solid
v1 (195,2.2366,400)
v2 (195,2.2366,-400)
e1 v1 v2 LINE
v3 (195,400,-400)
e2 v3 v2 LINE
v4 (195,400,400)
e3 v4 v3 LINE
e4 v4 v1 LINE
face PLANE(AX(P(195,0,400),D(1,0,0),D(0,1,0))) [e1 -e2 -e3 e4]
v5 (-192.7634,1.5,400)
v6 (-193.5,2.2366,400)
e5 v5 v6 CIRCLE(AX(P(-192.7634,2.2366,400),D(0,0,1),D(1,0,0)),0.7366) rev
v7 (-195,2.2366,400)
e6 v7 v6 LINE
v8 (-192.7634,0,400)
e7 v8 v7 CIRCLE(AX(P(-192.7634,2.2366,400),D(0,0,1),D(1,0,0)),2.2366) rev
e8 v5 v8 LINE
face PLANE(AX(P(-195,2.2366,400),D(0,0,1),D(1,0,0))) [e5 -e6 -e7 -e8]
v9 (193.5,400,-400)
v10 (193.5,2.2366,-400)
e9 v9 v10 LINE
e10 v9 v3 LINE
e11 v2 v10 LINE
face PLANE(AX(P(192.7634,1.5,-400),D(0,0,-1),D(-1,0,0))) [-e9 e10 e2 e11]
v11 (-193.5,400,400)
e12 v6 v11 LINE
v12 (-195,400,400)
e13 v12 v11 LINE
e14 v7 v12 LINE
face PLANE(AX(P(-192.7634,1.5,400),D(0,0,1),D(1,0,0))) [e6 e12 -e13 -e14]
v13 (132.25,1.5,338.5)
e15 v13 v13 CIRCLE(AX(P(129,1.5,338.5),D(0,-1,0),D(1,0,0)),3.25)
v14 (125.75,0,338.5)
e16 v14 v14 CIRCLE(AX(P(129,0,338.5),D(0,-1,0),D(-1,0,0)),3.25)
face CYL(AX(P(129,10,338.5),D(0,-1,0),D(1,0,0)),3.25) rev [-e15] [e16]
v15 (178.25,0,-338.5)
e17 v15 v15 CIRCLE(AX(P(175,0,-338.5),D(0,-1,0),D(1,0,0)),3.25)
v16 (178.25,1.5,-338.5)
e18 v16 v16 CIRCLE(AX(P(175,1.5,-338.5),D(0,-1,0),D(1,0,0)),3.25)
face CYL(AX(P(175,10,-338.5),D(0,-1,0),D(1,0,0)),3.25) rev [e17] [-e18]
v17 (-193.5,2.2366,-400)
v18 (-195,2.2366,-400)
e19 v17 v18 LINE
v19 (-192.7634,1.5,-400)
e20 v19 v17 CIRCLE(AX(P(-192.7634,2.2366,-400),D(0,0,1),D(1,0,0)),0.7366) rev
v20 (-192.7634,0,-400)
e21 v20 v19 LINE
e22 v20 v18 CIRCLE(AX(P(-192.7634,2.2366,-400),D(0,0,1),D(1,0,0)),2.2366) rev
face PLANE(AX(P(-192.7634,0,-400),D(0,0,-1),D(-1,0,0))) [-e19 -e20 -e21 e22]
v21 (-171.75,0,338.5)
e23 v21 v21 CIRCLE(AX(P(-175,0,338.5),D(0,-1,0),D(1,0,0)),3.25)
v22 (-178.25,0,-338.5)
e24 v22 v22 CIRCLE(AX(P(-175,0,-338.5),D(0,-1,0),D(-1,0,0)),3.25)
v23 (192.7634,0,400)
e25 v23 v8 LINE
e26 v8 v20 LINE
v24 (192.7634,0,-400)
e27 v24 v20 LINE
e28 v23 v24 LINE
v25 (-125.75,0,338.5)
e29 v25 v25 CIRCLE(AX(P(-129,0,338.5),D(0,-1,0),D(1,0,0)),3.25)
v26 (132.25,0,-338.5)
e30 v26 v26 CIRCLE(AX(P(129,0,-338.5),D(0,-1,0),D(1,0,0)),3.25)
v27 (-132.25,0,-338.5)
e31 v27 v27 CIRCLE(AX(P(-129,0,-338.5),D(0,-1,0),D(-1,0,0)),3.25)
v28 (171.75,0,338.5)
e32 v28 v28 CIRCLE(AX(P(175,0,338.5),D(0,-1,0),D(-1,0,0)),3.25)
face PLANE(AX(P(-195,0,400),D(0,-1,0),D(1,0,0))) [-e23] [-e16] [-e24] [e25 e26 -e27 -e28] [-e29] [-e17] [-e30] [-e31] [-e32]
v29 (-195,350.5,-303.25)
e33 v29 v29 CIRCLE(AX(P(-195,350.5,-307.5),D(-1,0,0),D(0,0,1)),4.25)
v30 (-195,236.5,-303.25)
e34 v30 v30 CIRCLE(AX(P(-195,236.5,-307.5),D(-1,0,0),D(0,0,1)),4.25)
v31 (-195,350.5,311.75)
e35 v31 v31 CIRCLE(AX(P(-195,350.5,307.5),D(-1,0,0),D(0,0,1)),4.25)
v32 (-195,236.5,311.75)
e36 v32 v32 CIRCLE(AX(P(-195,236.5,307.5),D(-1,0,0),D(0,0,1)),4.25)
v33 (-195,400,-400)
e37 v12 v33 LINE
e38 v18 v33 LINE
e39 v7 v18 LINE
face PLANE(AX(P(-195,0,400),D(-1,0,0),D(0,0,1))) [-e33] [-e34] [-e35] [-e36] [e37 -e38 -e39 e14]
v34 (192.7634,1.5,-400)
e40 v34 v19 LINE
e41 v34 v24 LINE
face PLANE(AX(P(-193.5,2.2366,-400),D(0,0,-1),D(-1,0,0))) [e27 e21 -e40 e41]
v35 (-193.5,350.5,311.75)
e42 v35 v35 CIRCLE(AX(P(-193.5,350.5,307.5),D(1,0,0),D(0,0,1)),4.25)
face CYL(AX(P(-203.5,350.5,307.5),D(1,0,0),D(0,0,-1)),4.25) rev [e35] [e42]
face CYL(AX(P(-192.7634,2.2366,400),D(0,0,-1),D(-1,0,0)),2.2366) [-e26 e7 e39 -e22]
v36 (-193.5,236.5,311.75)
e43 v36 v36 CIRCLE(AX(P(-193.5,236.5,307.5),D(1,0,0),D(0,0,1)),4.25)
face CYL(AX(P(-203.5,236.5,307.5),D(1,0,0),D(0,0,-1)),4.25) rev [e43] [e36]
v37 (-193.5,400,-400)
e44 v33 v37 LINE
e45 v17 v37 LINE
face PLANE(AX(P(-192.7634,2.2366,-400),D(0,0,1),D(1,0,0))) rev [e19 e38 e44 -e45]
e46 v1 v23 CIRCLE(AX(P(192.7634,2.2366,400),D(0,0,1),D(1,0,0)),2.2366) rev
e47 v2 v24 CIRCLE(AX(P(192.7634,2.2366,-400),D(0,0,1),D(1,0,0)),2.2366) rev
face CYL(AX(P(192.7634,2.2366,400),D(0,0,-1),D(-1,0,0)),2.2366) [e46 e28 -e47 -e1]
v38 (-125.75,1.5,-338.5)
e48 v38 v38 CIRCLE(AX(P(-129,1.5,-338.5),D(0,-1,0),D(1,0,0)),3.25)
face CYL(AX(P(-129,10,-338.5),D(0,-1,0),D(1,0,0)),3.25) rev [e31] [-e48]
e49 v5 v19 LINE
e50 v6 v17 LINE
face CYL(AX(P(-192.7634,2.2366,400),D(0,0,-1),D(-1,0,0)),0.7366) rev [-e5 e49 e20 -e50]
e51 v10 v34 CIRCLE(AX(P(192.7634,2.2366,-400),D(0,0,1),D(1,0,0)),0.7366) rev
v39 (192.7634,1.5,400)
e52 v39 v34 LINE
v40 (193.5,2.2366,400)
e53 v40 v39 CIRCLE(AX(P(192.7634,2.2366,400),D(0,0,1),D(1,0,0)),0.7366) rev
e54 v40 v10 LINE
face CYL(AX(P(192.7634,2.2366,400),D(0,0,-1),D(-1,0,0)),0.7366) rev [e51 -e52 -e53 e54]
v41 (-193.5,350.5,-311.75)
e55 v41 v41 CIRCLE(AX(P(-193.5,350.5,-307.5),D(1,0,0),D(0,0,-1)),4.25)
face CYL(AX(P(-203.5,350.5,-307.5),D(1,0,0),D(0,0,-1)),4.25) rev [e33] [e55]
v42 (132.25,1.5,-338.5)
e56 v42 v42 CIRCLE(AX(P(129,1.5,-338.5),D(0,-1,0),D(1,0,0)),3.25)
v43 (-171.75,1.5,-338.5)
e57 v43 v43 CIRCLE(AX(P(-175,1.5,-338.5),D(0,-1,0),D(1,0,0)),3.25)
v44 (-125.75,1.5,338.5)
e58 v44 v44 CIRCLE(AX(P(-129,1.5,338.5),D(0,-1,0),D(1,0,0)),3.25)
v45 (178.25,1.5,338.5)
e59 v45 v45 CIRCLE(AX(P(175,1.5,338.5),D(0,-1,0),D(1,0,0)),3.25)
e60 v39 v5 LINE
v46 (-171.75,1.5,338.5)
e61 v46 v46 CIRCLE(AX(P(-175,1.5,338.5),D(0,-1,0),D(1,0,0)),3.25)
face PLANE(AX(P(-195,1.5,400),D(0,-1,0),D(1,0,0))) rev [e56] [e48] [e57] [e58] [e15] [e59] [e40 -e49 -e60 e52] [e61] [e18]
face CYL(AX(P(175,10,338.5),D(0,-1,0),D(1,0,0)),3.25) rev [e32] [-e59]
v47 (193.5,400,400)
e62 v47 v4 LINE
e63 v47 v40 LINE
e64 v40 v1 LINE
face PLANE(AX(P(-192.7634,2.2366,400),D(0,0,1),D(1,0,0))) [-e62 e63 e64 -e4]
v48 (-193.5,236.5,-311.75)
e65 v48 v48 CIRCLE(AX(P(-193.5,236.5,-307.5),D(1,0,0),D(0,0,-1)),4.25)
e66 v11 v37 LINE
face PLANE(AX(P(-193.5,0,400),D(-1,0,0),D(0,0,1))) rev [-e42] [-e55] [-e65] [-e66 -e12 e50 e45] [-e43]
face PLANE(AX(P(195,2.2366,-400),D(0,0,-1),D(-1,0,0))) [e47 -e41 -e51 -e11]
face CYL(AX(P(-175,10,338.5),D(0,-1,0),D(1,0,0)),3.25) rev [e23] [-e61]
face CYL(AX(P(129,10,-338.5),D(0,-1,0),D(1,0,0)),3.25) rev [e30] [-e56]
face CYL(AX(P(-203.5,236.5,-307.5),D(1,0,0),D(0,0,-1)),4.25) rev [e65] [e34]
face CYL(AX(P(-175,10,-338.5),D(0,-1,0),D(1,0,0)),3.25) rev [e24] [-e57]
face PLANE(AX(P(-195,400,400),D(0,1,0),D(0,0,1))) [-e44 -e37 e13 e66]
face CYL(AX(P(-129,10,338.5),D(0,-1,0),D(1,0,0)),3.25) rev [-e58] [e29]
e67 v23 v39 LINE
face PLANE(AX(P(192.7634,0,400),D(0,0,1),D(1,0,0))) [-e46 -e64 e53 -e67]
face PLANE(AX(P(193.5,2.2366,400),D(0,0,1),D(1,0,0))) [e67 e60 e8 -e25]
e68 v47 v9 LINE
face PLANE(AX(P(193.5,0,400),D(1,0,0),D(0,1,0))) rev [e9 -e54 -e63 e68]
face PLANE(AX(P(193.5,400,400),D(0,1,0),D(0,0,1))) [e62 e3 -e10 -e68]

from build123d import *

# Parameters (mm, degrees)
TABAN_FLAN_1_DEPTH    = 400
IZIM2_R               = 4.25
KES_EKSTR_ZYON1_DEPTH = 10
IZIM3_R               = 3.25
KES_EKSTR_ZYON2_DEPTH = 10


# Sheet-metal steps are written as plain solids
with BuildPart() as part:
    # Çizim1 → Taban-Flanş1 (new, symmetric)
    with BuildSketch(Plane.XY):
        with BuildLine():
            Line((-195, 400), (-195, 2.2366))
            ThreePointArc((-195, 2.2366), (-194.344915027, 0.655084973), (-192.7634, 0))
            Line((-192.7634, 0), (192.7634, 0))
            ThreePointArc((192.7634, 0), (194.344915027, 0.655084973), (195, 2.2366))
            Line((195, 2.2366), (195, 400))
            Line((195, 400), (193.5, 400))
            Line((193.5, 400), (193.5, 2.2366))
            ThreePointArc((193.5, 2.2366), (193.284254855, 1.715745145), (192.7634, 1.5))
            Line((192.7634, 1.5), (-192.7634, 1.5))
            ThreePointArc((-192.7634, 1.5), (-193.284254855, 1.715745145), (-193.5, 2.2366))
            Line((-193.5, 2.2366), (-193.5, 400))
            Line((-193.5, 400), (-195, 400))
        make_face()
    extrude(amount=TABAN_FLAN_1_DEPTH, both=True)

    # Çizim2 → Kes-Ekstrüzyon1 (cut)
    with BuildSketch(Plane(origin=(-193.5, 0, 0), x_dir=(0, 0, -1), z_dir=(1, 0, 0))):
        with Locations((307.5, 350.5)):
            Circle(IZIM2_R)
        with Locations((307.5, 236.5)):
            Circle(IZIM2_R)
        with Locations(Location((-307.5, 236.5, 0), (0, 0, 180))):
            Circle(IZIM2_R)
        with Locations(Location((-307.5, 350.5, 0), (0, 0, 180))):
            Circle(IZIM2_R)
    extrude(amount=-KES_EKSTR_ZYON1_DEPTH, mode=Mode.SUBTRACT)

    # Çizim3 → Kes-Ekstrüzyon2 (cut)
    with BuildSketch(Plane.XZ):
        with Locations((-175, 338.5)):
            Circle(IZIM3_R)
        with Locations((-129, 338.5)):
            Circle(IZIM3_R)
        with Locations((175, 338.5)):
            Circle(IZIM3_R)
        with Locations((129, 338.5)):
            Circle(IZIM3_R)
        with Locations((-175, -338.5)):
            Circle(IZIM3_R)
        with Locations((-129, -338.5)):
            Circle(IZIM3_R)
        with Locations((129, -338.5)):
            Circle(IZIM3_R)
        with Locations((175, -338.5)):
            Circle(IZIM3_R)
    extrude(amount=-KES_EKSTR_ZYON2_DEPTH, mode=Mode.SUBTRACT)


solid = part.part
